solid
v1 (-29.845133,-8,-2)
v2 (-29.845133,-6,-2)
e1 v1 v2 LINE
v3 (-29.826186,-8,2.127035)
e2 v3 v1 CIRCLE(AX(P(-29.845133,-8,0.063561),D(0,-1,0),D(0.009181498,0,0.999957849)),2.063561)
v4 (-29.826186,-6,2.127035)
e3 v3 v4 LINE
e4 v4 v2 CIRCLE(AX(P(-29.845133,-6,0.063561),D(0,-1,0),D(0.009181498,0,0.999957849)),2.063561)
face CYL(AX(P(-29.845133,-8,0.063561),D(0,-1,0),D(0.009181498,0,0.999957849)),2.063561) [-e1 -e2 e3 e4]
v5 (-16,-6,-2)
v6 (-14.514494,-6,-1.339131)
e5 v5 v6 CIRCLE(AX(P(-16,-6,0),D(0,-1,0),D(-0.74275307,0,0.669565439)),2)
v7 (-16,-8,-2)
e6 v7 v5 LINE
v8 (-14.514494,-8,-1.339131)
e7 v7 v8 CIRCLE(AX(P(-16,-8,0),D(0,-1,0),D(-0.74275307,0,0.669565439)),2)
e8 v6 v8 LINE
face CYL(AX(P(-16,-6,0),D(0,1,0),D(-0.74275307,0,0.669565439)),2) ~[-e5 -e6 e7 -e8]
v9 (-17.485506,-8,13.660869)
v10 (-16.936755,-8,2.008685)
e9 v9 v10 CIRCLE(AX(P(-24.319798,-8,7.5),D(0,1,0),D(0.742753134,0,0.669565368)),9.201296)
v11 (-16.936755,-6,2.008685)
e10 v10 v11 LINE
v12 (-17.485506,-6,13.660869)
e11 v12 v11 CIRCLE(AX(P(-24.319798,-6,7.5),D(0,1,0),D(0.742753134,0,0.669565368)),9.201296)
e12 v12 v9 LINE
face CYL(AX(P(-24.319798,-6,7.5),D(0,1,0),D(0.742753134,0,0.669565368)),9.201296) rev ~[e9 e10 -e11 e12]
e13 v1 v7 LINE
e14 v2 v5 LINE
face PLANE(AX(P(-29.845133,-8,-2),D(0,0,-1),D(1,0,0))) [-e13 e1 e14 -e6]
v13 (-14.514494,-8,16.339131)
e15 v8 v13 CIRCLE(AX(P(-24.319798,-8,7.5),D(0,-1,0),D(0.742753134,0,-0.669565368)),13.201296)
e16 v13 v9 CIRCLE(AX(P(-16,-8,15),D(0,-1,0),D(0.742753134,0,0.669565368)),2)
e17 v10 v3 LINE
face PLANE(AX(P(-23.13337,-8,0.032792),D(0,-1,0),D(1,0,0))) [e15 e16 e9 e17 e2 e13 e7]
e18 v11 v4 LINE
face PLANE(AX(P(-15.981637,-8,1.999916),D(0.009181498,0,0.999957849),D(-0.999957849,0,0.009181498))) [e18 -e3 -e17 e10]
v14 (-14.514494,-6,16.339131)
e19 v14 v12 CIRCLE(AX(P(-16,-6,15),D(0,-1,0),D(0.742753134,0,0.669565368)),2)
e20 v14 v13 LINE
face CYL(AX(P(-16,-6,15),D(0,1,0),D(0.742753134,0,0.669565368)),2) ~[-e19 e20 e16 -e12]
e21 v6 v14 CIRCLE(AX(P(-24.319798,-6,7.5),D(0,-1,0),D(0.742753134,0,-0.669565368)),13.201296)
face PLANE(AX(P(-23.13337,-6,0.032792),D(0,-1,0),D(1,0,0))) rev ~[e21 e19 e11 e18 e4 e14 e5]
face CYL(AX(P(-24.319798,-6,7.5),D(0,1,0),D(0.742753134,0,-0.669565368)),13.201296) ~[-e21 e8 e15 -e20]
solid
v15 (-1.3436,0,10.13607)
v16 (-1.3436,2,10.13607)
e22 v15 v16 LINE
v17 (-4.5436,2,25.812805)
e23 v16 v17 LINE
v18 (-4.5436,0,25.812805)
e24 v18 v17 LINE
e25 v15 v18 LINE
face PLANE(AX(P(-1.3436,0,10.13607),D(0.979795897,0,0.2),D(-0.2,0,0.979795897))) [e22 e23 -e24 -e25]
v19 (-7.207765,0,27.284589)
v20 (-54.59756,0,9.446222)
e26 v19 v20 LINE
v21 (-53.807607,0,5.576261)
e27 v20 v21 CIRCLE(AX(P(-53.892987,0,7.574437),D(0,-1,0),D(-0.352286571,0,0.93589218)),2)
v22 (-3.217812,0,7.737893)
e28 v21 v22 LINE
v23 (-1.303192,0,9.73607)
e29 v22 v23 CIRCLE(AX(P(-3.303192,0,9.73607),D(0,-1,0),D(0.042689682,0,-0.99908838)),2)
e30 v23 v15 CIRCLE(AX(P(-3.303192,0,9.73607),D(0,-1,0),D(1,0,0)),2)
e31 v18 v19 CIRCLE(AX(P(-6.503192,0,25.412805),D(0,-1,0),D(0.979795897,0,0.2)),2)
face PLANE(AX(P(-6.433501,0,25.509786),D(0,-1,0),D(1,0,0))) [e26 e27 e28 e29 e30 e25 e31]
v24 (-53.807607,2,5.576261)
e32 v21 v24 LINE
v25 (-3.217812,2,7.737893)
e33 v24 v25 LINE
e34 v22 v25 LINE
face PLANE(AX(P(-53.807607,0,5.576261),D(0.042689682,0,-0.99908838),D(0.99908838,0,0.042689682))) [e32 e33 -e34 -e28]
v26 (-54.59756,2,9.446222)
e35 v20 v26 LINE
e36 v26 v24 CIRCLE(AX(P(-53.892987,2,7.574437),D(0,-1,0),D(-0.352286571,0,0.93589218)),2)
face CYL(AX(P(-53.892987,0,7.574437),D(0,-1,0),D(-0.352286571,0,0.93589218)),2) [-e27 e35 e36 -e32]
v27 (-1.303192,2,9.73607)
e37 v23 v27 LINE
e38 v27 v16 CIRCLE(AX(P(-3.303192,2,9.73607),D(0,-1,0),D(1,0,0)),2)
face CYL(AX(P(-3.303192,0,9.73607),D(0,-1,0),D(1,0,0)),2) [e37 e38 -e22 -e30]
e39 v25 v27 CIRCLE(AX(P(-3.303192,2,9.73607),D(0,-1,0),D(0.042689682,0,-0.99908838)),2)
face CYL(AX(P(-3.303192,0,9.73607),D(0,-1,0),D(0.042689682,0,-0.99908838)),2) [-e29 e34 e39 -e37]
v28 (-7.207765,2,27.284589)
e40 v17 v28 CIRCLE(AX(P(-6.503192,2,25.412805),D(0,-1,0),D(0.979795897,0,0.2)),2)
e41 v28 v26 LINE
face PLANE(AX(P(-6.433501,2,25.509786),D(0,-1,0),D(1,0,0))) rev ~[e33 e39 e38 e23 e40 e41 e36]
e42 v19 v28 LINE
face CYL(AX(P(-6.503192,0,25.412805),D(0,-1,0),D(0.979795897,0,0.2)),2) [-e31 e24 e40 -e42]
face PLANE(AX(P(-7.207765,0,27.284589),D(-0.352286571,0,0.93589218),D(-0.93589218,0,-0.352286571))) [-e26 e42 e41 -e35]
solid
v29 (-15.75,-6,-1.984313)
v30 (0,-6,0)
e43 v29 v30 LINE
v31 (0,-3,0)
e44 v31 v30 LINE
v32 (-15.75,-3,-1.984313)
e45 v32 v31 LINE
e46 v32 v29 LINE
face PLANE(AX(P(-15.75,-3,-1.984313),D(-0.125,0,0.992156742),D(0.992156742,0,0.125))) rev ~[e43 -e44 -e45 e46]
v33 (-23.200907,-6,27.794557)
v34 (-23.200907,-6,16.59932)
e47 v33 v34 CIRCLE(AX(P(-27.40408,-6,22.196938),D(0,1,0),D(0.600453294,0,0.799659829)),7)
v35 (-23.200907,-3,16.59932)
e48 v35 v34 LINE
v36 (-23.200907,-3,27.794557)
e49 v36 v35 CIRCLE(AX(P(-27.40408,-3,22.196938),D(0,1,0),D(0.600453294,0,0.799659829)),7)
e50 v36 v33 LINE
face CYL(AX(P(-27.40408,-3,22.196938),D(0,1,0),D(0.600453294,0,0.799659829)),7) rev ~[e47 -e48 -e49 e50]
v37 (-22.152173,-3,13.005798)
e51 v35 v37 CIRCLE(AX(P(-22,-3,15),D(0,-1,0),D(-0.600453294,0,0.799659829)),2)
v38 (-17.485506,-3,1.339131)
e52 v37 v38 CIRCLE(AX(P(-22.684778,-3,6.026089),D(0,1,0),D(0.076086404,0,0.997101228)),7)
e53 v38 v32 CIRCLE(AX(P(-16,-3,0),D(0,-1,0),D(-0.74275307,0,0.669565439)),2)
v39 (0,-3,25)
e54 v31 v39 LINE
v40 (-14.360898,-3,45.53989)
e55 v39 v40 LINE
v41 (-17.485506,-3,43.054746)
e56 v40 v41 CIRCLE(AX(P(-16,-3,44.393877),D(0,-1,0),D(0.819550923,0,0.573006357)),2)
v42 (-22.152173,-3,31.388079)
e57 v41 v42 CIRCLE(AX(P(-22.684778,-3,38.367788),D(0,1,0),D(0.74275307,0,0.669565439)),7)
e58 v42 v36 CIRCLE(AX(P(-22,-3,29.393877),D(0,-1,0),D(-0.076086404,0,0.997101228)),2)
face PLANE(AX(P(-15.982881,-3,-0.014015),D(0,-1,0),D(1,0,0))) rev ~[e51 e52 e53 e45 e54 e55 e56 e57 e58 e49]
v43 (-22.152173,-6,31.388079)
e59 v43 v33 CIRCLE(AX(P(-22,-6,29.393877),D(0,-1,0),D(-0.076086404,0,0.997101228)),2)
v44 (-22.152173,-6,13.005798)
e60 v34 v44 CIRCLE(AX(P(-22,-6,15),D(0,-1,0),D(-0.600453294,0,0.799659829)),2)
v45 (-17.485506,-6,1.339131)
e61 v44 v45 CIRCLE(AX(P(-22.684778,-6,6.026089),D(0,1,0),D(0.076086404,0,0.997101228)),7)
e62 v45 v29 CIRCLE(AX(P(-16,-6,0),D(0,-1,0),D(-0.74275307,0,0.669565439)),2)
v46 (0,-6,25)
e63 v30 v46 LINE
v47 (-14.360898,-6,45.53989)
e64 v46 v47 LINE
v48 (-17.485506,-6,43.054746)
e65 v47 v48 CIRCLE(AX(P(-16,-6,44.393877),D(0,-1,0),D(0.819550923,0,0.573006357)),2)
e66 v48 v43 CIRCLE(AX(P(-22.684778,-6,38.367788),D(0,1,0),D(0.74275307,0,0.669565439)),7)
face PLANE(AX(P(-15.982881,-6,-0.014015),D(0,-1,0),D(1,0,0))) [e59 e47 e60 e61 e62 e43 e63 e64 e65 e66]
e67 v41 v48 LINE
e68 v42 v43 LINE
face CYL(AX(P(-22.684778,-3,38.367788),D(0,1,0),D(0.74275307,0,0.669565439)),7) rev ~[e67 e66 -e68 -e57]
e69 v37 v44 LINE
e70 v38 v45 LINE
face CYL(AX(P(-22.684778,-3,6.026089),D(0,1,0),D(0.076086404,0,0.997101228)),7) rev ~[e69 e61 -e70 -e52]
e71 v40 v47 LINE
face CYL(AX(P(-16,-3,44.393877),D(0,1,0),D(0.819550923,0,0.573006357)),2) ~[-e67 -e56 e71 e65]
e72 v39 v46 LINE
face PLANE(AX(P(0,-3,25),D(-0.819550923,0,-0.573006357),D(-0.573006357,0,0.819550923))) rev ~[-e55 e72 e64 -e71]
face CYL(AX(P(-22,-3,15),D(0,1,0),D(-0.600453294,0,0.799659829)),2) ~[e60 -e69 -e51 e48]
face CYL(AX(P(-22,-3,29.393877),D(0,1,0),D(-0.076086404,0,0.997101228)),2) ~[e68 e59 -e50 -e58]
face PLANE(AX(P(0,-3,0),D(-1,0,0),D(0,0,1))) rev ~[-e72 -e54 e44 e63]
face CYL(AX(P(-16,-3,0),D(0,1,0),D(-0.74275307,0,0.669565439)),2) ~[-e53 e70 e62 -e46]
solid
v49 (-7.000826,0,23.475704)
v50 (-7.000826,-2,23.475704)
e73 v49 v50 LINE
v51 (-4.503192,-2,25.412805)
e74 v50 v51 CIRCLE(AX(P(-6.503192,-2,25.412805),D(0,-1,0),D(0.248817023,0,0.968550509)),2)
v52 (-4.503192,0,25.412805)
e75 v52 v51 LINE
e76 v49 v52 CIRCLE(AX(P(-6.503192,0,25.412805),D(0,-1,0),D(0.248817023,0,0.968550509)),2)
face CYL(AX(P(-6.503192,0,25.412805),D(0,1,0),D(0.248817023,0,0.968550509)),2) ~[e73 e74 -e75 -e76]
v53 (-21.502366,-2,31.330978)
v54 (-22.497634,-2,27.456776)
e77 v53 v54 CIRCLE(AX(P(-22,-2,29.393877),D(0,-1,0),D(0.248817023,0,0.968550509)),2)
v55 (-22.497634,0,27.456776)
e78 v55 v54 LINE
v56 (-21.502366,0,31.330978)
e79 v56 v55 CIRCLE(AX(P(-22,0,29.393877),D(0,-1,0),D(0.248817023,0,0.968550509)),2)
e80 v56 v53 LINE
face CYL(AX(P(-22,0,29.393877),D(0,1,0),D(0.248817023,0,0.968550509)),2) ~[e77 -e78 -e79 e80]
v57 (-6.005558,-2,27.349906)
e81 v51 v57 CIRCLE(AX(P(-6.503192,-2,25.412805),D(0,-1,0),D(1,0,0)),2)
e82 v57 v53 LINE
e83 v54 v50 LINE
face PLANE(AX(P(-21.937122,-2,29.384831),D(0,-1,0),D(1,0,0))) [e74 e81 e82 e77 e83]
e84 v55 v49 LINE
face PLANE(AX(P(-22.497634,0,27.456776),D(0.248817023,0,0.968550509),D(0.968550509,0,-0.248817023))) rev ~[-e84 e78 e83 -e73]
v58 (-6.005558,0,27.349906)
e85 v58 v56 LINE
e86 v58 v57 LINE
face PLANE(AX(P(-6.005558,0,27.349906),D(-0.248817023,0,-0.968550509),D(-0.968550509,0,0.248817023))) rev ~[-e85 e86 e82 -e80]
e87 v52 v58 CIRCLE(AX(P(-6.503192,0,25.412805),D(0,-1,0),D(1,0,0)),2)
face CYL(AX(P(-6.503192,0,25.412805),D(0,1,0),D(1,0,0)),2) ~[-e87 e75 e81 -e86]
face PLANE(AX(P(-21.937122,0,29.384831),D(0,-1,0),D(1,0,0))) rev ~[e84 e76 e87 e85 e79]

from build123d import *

# Parameters (mm, degrees)
F2_DEPTH  = 2
F4_DEPTH  = 2
F7_DEPTH  = 3
F10_DEPTH = 2
F12_DEPTH = 2


with BuildPart() as f2:
    # F1 (on Front) → F2 (new body)
    with BuildSketch(Plane.XZ):
        with BuildLine():
            ThreePointArc((-22.4976340457, 27.4567758947), (-20.7742896124, 27.8134864408), (-20, 29.3938769134))
            ThreePointArc((-20, 29.3938769134), (-20.4196095275, 30.619587301), (-21.5023659543, 31.3309779321))
            ThreePointArc((-21.5023659543, 31.3309779321), (-23.9371010187, 29.8915109591), (-22.4976340457, 27.4567758947))
        make_face()
        with BuildLine():
            ThreePointArc((-4.5031918506, 25.4128045476), (-4.9228013781, 26.6385149352), (-6.0055578049, 27.3499055663))
            ThreePointArc((-6.0055578049, 27.3499055663), (-8.4402928693, 25.9104385933), (-7.0008258964, 23.4757035289))
            ThreePointArc((-7.0008258964, 23.4757035289), (-5.277481463, 23.832414075), (-4.5031918506, 25.4128045476))
        make_face()
        with BuildLine():
            ThreePointArc((-21.5023659543, 31.3309779321), (-20.4196095275, 30.619587301), (-20, 29.3938769134))
            ThreePointArc((-20, 29.3938769134), (-20.7742896124, 27.8134864408), (-22.4976340457, 27.4567758947))
            Line((-22.4976340457, 27.4567758947), (-7.0008258964, 23.4757035289))
            ThreePointArc((-7.0008258964, 23.4757035289), (-8.4402928693, 25.9104385933), (-6.0055578049, 27.3499055663))
            Line((-6.0055578049, 27.3499055663), (-21.5023659543, 31.3309779321))
        make_face()
    extrude(amount=F2_DEPTH)


with BuildPart() as f4:
    # F3 (on Front) → F4 (new body)
    with BuildSketch(Plane.XZ):
        with BuildLine():
            ThreePointArc((-7.2077649929, 27.2845889067), (-7.6413600534, 23.7682459009), (-4.5031918506, 25.4128045476))
            ThreePointArc((-4.5031918506, 25.4128045476), (-4.5133195446, 25.6138224716), (-4.5436000564, 25.8128045476))
            ThreePointArc((-4.5436000564, 25.8128045476), (-5.5360800401, 27.1634315055), (-7.2077649929, 27.2845889067))
        make_face()
        with BuildLine():
            ThreePointArc((-4.5436000564, 25.8128045476), (-4.5133195446, 25.6138224716), (-4.5031918506, 25.4128045476))
            ThreePointArc((-4.5031918506, 25.4128045476), (-7.6413600534, 23.7682459009), (-7.2077649929, 27.2845889067))
            Line((-7.2077649929, 27.2845889067), (-54.5975598486, 9.4462217298))
            ThreePointArc((-54.5975598486, 9.4462217298), (-52.7548185036, 9.2189960173), (-51.8929867063, 7.5744373707))
            ThreePointArc((-51.8929867063, 7.5744373707), (-52.4489024417, 6.1907391967), (-53.8076073431, 5.5762606107))
            Line((-53.8076073431, 5.5762606107), (-3.2178124874, 7.7378934337))
            ThreePointArc((-3.2178124874, 7.7378934337), (-4.8790375607, 10.9676181215), (-1.3436000564, 10.1360701938))
            Line((-1.3436000564, 10.1360701938), (-4.5436000564, 25.8128045476))
        make_face()
        with BuildLine():
            ThreePointArc((-1.3031918506, 9.7360701938), (-1.3133195446, 9.9370881178), (-1.3436000564, 10.1360701938))
            ThreePointArc((-1.3436000564, 10.1360701938), (-4.8790375607, 10.9676181215), (-3.2178124874, 7.7378934337))
            ThreePointArc((-3.2178124874, 7.7378934337), (-1.859107586, 8.3523720198), (-1.3031918506, 9.7360701938))
        make_face()
        with BuildLine():
            ThreePointArc((-51.8929867063, 7.5744373707), (-52.7548185036, 9.2189960173), (-54.5975598486, 9.4462217298))
            ThreePointArc((-54.5975598486, 9.4462217298), (-55.8525785005, 7.1744373707), (-53.8076073431, 5.5762606107))
            ThreePointArc((-53.8076073431, 5.5762606107), (-52.4489024417, 6.1907391967), (-51.8929867063, 7.5744373707))
        make_face()
    extrude(amount=-F4_DEPTH)


with BuildPart() as f7:
    # F6 (on Front) → F7 (new body)
    with BuildSketch(Plane.XZ):
        with BuildLine():
            ThreePointArc((-15.75, -1.9843134833), (-14.5, -1.3228756555), (-14, 0))
            ThreePointArc((-14, 0), (-15.2827177269, 1.8669510279), (-17.4855061407, 1.339130877))
            ThreePointArc((-17.4855061407, 1.339130877), (-17.7728337373, -0.9257756424), (-15.75, -1.9843134833))
        make_face()
        with BuildLine():
            ThreePointArc((-17.4855061407, 1.339130877), (-15.2827177269, 1.8669510279), (-14, 0))
            ThreePointArc((-14, 0), (-14.5, -1.3228756555), (-15.75, -1.9843134833))
            Line((-15.75, -1.9843134833), (0, 0))
            Line((0, 0), (0, 25))
            Line((0, 25), (-14.3608981549, 45.5398896277))
            ThreePointArc((-14.3608981549, 45.5398896277), (-14.0923569922, 44.9946249095), (-14, 44.3938769134))
            ThreePointArc((-14, 44.3938769134), (-15.2827177269, 42.5269258855), (-17.4855061407, 43.0547460364))
            ThreePointArc((-17.4855061407, 43.0547460364), (-16.1854407971, 35.7680532322), (-22.1521728074, 31.3880793697))
            ThreePointArc((-22.1521728074, 31.3880793697), (-20.6406519237, 30.8609054773), (-20, 29.3938769134))
            ThreePointArc((-20, 29.3938769134), (-21.1060797511, 27.6047691501), (-23.2009065886, 27.7945572564))
            ThreePointArc((-23.2009065886, 27.7945572564), (-20.4040796488, 22.1969384567), (-23.2009065886, 16.599319657))
            ThreePointArc((-23.2009065886, 16.599319657), (-21.1060797511, 16.7891077633), (-20, 15))
            ThreePointArc((-20, 15), (-20.6406519237, 13.5329714361), (-22.1521728074, 13.0057975437))
            ThreePointArc((-22.1521728074, 13.0057975437), (-16.1854407971, 8.6258236812), (-17.4855061407, 1.339130877))
        make_face()
        with BuildLine():
            ThreePointArc((-23.2009065886, 16.599319657), (-23.9199104817, 14.4396931713), (-22.1521728074, 13.0057975437))
            ThreePointArc((-22.1521728074, 13.0057975437), (-20.6406519237, 13.5329714361), (-20, 15))
            ThreePointArc((-20, 15), (-21.1060797511, 16.7891077633), (-23.2009065886, 16.599319657))
        make_face()
        with BuildLine():
            ThreePointArc((-22.1521728074, 31.3880793697), (-23.9199104817, 29.9541837421), (-23.2009065886, 27.7945572564))
            ThreePointArc((-23.2009065886, 27.7945572564), (-21.1060797511, 27.6047691501), (-20, 29.3938769134))
            ThreePointArc((-20, 29.3938769134), (-20.6406519237, 30.8609054773), (-22.1521728074, 31.3880793697))
        make_face()
        with BuildLine():
            ThreePointArc((-14, 44.3938769134), (-14.0923569922, 44.9946249095), (-14.3608981549, 45.5398896277))
            ThreePointArc((-14.3608981549, 45.5398896277), (-17.2449428009, 45.9591620064), (-17.4855061407, 43.0547460364))
            ThreePointArc((-17.4855061407, 43.0547460364), (-15.2827177269, 42.5269258855), (-14, 44.3938769134))
        make_face()
    extrude(amount=F7_DEPTH)


with BuildPart() as f7_1:
    # F8: moved
    add(f7.part.moved(Location((0, -3, 0))))


with BuildPart() as f10:
    # F9 (on face) → F10 (new body)
    with BuildSketch(Plane.XZ.offset(6)):
        with BuildLine():
            ThreePointArc((-14.5144937322, -1.3391307361), (-14.133048938, -0.7172821845), (-14, 0))
            ThreePointArc((-14, 0), (-15.2827177269, 1.8669510279), (-17.4855061407, 1.339130877))
            ThreePointArc((-17.4855061407, 1.339130877), (-17.3391308066, -1.4855062043), (-14.5144937322, -1.3391307361))
        make_face()
        with BuildLine():
            ThreePointArc((-17.4855061407, 1.339130877), (-15.2827177269, 1.8669510279), (-14, 0))
            ThreePointArc((-14, 0), (-14.133048938, -0.7172821845), (-14.5144937322, -1.3391307361))
            ThreePointArc((-14.5144937322, -1.3391307361), (-11.1185016612, 7.5), (-14.5144937322, 16.3391307361))
            ThreePointArc((-14.5144937322, 16.3391307361), (-14.133048938, 15.7172821845), (-14, 15))
            ThreePointArc((-14, 15), (-15.2827178155, 13.133048938), (-17.4855062678, 13.6608692639))
            ThreePointArc((-17.4855062678, 13.6608692639), (-15.1185016612, 7.5000000949), (-17.4855061407, 1.339130877))
        make_face()
        with BuildLine():
            ThreePointArc((-14.5144937322, 16.3391307361), (-17.3391307361, 16.4855062678), (-17.4855062678, 13.6608692639))
            ThreePointArc((-17.4855062678, 13.6608692639), (-15.2827178155, 13.133048938), (-14, 15))
            ThreePointArc((-14, 15), (-14.133048938, 15.7172821845), (-14.5144937322, 16.3391307361))
        make_face()
    extrude(amount=F10_DEPTH)

    # F11 (on face) → F12 (join, through all)
    with BuildSketch(Plane.XZ.offset(8)):
        with BuildLine():
            Line((-29.8451329624, -2), (-16, -2))
            Line((-16, -2), (-15.9816370049, 1.9999156983))
            Line((-15.9816370049, 1.9999156983), (-29.8261863834, 2.1270347527))
            ThreePointArc((-29.8261863834, 2.1270347527), (-28.3792917586, 1.5160046749), (-27.7815720957, 0.0635608668))
            ThreePointArc((-27.7815720957, 0.0635608668), (-28.3859750802, -1.3955970155), (-29.8451329624, -2))
        make_face()
        with BuildLine():
            ThreePointArc((-29.8261863834, 2.1270347527), (-31.9086720839, 0.0730342561), (-29.8451329624, -2))
            ThreePointArc((-29.8451329624, -2), (-28.3859750802, -1.3955970155), (-27.7815720957, 0.0635608668))
            ThreePointArc((-27.7815720957, 0.0635608668), (-28.3792917586, 1.5160046749), (-29.8261863834, 2.1270347527))
        make_face()
    extrude(amount=-F12_DEPTH)


solid = Compound([f2.part, f4.part, f7_1.part, f10.part])
